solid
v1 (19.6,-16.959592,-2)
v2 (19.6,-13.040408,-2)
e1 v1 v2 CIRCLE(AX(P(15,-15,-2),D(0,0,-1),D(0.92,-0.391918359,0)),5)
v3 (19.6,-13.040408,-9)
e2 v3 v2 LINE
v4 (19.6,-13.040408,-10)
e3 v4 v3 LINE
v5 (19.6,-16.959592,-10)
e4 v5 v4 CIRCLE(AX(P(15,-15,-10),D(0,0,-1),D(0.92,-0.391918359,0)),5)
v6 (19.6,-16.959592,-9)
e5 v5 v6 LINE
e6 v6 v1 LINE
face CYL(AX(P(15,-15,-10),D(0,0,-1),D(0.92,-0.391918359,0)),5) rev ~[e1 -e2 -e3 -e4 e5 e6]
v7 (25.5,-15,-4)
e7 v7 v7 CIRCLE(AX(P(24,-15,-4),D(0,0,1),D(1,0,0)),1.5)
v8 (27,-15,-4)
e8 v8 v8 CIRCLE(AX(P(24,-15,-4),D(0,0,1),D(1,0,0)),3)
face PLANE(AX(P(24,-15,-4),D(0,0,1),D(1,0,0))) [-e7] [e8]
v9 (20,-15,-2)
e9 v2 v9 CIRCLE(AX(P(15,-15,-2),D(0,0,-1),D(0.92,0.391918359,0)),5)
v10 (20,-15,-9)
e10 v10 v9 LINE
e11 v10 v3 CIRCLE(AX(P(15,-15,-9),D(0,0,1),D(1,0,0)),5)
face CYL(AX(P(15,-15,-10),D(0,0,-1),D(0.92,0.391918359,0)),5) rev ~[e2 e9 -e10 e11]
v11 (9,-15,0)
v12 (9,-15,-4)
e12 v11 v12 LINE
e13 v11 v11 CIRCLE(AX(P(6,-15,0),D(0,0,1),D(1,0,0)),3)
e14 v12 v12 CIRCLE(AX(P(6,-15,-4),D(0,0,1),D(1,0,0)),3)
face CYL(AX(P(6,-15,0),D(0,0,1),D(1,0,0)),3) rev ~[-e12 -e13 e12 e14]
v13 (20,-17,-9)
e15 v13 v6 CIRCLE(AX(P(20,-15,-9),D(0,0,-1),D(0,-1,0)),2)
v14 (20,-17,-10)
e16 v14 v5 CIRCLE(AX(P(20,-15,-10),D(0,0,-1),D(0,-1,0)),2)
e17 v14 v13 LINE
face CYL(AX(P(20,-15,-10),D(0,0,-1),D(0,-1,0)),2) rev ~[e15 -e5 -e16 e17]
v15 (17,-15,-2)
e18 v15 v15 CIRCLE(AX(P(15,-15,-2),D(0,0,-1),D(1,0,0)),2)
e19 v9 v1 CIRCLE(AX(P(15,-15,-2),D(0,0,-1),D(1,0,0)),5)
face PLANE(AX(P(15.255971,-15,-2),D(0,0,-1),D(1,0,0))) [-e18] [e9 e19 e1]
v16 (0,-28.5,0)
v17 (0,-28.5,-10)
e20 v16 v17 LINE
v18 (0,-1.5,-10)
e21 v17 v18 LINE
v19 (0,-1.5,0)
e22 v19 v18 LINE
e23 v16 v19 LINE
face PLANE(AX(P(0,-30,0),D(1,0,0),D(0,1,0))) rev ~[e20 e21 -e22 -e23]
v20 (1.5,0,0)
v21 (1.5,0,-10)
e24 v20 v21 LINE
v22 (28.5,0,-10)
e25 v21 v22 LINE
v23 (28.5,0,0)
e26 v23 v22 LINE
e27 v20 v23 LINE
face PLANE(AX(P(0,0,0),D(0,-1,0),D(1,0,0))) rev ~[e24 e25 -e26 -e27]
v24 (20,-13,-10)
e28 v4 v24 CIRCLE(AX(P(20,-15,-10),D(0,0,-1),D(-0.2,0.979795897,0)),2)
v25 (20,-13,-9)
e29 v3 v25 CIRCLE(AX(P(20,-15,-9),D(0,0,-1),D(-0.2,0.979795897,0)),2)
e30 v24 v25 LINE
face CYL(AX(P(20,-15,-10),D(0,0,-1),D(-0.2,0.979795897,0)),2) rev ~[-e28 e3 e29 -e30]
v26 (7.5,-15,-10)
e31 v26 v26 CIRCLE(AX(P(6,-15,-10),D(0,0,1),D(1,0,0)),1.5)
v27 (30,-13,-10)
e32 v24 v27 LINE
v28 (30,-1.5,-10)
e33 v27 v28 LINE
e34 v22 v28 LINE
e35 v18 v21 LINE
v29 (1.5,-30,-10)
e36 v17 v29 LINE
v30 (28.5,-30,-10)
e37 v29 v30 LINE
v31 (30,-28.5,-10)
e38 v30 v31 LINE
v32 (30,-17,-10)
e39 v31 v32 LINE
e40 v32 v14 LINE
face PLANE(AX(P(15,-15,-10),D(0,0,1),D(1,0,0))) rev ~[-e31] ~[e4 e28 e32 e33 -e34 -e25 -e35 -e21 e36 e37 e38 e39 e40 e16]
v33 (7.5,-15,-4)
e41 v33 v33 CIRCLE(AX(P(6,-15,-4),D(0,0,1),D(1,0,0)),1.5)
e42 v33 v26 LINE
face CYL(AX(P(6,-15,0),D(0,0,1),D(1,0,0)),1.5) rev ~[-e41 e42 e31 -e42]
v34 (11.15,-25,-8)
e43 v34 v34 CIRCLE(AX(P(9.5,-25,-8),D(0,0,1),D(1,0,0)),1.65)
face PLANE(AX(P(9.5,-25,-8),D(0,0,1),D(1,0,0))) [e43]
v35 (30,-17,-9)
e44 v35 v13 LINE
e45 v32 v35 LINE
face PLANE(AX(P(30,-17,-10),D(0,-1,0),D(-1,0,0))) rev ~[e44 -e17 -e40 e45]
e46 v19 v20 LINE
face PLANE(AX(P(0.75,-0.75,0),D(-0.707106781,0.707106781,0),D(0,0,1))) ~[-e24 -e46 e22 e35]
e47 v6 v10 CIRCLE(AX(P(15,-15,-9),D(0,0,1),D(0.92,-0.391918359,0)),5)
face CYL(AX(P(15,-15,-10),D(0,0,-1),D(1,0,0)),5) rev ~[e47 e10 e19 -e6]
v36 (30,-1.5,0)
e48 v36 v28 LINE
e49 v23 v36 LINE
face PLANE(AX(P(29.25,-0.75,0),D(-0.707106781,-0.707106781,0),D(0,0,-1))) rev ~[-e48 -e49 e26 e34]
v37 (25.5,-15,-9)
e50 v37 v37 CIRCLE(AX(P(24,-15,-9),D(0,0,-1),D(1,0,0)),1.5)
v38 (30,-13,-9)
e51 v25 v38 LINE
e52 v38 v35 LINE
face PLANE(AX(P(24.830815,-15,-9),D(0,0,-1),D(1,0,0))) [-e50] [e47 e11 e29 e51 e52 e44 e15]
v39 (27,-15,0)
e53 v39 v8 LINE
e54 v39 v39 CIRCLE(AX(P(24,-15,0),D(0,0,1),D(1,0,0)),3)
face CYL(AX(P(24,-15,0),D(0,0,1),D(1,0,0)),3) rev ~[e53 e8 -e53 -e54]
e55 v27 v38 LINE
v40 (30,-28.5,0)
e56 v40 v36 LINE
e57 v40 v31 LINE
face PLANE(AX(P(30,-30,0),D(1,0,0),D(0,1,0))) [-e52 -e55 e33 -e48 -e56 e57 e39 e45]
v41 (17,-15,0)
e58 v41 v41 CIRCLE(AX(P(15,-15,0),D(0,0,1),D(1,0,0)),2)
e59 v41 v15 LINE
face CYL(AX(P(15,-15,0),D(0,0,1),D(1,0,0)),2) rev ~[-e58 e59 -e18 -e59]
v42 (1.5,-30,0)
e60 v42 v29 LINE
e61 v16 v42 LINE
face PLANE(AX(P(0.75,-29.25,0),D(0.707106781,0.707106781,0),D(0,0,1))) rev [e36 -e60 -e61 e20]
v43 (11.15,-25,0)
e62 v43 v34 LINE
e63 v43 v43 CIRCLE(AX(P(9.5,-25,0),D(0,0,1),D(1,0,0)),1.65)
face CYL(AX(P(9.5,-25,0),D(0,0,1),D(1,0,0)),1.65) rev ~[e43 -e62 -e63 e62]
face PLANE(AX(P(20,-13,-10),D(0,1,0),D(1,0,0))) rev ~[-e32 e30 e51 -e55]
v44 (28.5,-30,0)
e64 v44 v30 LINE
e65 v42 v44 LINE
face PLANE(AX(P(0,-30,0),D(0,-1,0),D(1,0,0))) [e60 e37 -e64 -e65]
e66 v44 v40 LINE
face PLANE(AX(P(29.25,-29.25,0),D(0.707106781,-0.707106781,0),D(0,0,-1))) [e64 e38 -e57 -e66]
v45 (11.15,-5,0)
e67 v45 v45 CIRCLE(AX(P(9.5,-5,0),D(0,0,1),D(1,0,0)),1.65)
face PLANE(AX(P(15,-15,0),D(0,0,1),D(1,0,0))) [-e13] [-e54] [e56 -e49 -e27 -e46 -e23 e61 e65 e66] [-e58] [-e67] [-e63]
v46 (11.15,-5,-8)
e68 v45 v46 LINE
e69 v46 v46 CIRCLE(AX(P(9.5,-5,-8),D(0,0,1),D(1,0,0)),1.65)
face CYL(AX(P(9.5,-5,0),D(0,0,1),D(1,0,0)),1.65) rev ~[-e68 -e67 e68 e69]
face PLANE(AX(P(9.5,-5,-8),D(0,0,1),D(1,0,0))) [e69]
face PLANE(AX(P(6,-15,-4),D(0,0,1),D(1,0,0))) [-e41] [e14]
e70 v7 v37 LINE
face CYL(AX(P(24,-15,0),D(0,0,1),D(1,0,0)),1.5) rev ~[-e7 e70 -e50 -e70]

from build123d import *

# Parameters (mm, degrees)
F0_W     = 30
F0_H     = 30
F0_R     = 1.65
F0_R_2   = 3
F0_R_3   = 2
F0_R_4   = 1.5
F1_DEPTH = 10
F2_DEPTH = 12
F3_SIZE  = 1.5
F4_DEPTH = 4
F5_DEPTH = 8
F6_R     = 2
F7_DEPTH = 8
F6_R_2   = 1.5
F8_DEPTH = 1


# Not quite as in the source:
# - a feature names something its author has since deleted; it is built from what else it names


with BuildPart() as f1:
    # F0 (on Top) → F1 (new body)
    with BuildSketch(Plane.XY):
        with Locations((15, -15)):
            Rectangle(F0_W, F0_H)
        with Locations((9.5, -25)):
            Circle(F0_R, mode=Mode.SUBTRACT)
        with Locations((15, -24)):
            Circle(F0_R_2, mode=Mode.SUBTRACT)
        with Locations((6, -15)):
            Circle(F0_R_2, mode=Mode.SUBTRACT)
        with Locations((9.5, -5)):
            Circle(F0_R, mode=Mode.SUBTRACT)
        with Locations((15, -15)):
            Circle(F0_R_3, mode=Mode.SUBTRACT)
        with Locations((24, -15)):
            Circle(F0_R_2, mode=Mode.SUBTRACT)
        with Locations((15, -6)):
            Circle(F0_R_2, mode=Mode.SUBTRACT)
        with Locations((15, -15)):
            Circle(F0_R_3)
        with Locations((15, -6)):
            Circle(F0_R_2)
        with Locations((15, -6)):
            Circle(F0_R_4, mode=Mode.SUBTRACT)
        with Locations((15, -24)):
            Circle(F0_R_2)
        with Locations((15, -24)):
            Circle(F0_R_4, mode=Mode.SUBTRACT)
        with Locations((9.5, -5)):
            Circle(F0_R)
        with Locations((9.5, -25)):
            Circle(F0_R)
        with Locations((24, -15)):
            Circle(F0_R_2)
        with Locations((24, -15)):
            Circle(F0_R_4, mode=Mode.SUBTRACT)
        with Locations((6, -15)):
            Circle(F0_R_2)
        with Locations((6, -15)):
            Circle(F0_R_4, mode=Mode.SUBTRACT)
        with Locations((15, -24)):
            Circle(F0_R_4)
        with Locations((15, -6)):
            Circle(F0_R_4)
    extrude(amount=-F1_DEPTH)

    # F0 (on Top) → F2 (cut)
    with BuildSketch(Plane.XY):
        with Locations((15, -15)):
            Circle(F0_R_3)
    extrude(amount=-F2_DEPTH, mode=Mode.SUBTRACT)

    # F3
    f3_edges = [f1.edges().sort_by_distance(p)[0] for p in [
        (30, -30, -5),
        (0, -30, -5),
        (0, 0, -5),
        (30, 0, -5),
    ]]
    chamfer(f3_edges, length=F3_SIZE)

    # F0 (on Top) → F4 (cut)
    with BuildSketch(Plane.XY):
        with Locations((6, -15)):
            Circle(F0_R_2)
        with Locations((6, -15)):
            Circle(F0_R_4, mode=Mode.SUBTRACT)
        with Locations((24, -15)):
            Circle(F0_R_2)
        with Locations((24, -15)):
            Circle(F0_R_4, mode=Mode.SUBTRACT)
    extrude(amount=-F4_DEPTH, mode=Mode.SUBTRACT)

    # F0 (on Top) → F5 (cut)
    with BuildSketch(Plane.XY):
        with Locations((9.5, -5)):
            Circle(F0_R)
        with Locations((9.5, -25)):
            Circle(F0_R)
    extrude(amount=-F5_DEPTH, mode=Mode.SUBTRACT)

    # F6 (on face) → F7 (cut)
    with BuildSketch(Plane(origin=(0, 0, -10), x_dir=(1, 0, 0), z_dir=(0, 0, -1))):
        with BuildLine():
            ThreePointArc((19.6, 13.0404082058), (18, 15), (19.6, 16.9595917942))
            ThreePointArc((19.6, 16.9595917942), (10, 15), (19.6, 13.0404082058))
        make_face()
        with Locations((15, 15)):
            Circle(F6_R, mode=Mode.SUBTRACT)
        with BuildLine():
            ThreePointArc((19.6, 13.0404082058), (19.8989794856, 14), (20, 15))
            ThreePointArc((20, 15), (19.8989794856, 16), (19.6, 16.9595917942))
            ThreePointArc((19.6, 16.9595917942), (18, 15), (19.6, 13.0404082058))
        make_face()
    extrude(amount=-F7_DEPTH, mode=Mode.SUBTRACT)

    # F6 (on face) → F8 (cut)
    with BuildSketch(Plane(origin=(0, 0, -10), x_dir=(1, 0, 0), z_dir=(0, 0, -1))):
        with BuildLine():
            ThreePointArc((19.6, 16.9595917942), (19.8989794856, 16), (20, 15))
            ThreePointArc((20, 15), (19.8989794856, 14), (19.6, 13.0404082058))
            ThreePointArc((19.6, 13.0404082058), (19.798982076, 13.010127694), (20, 13))
            Line((20, 13), (30, 13))
            Line((30, 13), (30, 17))
            Line((30, 17), (20, 17))
            ThreePointArc((20, 17), (19.798982076, 16.989872306), (19.6, 16.9595917942))
        make_face()
        with Locations((24, 15)):
            Circle(F6_R_2, mode=Mode.SUBTRACT)
    extrude(amount=-F8_DEPTH, mode=Mode.SUBTRACT)


solid = f1.part
